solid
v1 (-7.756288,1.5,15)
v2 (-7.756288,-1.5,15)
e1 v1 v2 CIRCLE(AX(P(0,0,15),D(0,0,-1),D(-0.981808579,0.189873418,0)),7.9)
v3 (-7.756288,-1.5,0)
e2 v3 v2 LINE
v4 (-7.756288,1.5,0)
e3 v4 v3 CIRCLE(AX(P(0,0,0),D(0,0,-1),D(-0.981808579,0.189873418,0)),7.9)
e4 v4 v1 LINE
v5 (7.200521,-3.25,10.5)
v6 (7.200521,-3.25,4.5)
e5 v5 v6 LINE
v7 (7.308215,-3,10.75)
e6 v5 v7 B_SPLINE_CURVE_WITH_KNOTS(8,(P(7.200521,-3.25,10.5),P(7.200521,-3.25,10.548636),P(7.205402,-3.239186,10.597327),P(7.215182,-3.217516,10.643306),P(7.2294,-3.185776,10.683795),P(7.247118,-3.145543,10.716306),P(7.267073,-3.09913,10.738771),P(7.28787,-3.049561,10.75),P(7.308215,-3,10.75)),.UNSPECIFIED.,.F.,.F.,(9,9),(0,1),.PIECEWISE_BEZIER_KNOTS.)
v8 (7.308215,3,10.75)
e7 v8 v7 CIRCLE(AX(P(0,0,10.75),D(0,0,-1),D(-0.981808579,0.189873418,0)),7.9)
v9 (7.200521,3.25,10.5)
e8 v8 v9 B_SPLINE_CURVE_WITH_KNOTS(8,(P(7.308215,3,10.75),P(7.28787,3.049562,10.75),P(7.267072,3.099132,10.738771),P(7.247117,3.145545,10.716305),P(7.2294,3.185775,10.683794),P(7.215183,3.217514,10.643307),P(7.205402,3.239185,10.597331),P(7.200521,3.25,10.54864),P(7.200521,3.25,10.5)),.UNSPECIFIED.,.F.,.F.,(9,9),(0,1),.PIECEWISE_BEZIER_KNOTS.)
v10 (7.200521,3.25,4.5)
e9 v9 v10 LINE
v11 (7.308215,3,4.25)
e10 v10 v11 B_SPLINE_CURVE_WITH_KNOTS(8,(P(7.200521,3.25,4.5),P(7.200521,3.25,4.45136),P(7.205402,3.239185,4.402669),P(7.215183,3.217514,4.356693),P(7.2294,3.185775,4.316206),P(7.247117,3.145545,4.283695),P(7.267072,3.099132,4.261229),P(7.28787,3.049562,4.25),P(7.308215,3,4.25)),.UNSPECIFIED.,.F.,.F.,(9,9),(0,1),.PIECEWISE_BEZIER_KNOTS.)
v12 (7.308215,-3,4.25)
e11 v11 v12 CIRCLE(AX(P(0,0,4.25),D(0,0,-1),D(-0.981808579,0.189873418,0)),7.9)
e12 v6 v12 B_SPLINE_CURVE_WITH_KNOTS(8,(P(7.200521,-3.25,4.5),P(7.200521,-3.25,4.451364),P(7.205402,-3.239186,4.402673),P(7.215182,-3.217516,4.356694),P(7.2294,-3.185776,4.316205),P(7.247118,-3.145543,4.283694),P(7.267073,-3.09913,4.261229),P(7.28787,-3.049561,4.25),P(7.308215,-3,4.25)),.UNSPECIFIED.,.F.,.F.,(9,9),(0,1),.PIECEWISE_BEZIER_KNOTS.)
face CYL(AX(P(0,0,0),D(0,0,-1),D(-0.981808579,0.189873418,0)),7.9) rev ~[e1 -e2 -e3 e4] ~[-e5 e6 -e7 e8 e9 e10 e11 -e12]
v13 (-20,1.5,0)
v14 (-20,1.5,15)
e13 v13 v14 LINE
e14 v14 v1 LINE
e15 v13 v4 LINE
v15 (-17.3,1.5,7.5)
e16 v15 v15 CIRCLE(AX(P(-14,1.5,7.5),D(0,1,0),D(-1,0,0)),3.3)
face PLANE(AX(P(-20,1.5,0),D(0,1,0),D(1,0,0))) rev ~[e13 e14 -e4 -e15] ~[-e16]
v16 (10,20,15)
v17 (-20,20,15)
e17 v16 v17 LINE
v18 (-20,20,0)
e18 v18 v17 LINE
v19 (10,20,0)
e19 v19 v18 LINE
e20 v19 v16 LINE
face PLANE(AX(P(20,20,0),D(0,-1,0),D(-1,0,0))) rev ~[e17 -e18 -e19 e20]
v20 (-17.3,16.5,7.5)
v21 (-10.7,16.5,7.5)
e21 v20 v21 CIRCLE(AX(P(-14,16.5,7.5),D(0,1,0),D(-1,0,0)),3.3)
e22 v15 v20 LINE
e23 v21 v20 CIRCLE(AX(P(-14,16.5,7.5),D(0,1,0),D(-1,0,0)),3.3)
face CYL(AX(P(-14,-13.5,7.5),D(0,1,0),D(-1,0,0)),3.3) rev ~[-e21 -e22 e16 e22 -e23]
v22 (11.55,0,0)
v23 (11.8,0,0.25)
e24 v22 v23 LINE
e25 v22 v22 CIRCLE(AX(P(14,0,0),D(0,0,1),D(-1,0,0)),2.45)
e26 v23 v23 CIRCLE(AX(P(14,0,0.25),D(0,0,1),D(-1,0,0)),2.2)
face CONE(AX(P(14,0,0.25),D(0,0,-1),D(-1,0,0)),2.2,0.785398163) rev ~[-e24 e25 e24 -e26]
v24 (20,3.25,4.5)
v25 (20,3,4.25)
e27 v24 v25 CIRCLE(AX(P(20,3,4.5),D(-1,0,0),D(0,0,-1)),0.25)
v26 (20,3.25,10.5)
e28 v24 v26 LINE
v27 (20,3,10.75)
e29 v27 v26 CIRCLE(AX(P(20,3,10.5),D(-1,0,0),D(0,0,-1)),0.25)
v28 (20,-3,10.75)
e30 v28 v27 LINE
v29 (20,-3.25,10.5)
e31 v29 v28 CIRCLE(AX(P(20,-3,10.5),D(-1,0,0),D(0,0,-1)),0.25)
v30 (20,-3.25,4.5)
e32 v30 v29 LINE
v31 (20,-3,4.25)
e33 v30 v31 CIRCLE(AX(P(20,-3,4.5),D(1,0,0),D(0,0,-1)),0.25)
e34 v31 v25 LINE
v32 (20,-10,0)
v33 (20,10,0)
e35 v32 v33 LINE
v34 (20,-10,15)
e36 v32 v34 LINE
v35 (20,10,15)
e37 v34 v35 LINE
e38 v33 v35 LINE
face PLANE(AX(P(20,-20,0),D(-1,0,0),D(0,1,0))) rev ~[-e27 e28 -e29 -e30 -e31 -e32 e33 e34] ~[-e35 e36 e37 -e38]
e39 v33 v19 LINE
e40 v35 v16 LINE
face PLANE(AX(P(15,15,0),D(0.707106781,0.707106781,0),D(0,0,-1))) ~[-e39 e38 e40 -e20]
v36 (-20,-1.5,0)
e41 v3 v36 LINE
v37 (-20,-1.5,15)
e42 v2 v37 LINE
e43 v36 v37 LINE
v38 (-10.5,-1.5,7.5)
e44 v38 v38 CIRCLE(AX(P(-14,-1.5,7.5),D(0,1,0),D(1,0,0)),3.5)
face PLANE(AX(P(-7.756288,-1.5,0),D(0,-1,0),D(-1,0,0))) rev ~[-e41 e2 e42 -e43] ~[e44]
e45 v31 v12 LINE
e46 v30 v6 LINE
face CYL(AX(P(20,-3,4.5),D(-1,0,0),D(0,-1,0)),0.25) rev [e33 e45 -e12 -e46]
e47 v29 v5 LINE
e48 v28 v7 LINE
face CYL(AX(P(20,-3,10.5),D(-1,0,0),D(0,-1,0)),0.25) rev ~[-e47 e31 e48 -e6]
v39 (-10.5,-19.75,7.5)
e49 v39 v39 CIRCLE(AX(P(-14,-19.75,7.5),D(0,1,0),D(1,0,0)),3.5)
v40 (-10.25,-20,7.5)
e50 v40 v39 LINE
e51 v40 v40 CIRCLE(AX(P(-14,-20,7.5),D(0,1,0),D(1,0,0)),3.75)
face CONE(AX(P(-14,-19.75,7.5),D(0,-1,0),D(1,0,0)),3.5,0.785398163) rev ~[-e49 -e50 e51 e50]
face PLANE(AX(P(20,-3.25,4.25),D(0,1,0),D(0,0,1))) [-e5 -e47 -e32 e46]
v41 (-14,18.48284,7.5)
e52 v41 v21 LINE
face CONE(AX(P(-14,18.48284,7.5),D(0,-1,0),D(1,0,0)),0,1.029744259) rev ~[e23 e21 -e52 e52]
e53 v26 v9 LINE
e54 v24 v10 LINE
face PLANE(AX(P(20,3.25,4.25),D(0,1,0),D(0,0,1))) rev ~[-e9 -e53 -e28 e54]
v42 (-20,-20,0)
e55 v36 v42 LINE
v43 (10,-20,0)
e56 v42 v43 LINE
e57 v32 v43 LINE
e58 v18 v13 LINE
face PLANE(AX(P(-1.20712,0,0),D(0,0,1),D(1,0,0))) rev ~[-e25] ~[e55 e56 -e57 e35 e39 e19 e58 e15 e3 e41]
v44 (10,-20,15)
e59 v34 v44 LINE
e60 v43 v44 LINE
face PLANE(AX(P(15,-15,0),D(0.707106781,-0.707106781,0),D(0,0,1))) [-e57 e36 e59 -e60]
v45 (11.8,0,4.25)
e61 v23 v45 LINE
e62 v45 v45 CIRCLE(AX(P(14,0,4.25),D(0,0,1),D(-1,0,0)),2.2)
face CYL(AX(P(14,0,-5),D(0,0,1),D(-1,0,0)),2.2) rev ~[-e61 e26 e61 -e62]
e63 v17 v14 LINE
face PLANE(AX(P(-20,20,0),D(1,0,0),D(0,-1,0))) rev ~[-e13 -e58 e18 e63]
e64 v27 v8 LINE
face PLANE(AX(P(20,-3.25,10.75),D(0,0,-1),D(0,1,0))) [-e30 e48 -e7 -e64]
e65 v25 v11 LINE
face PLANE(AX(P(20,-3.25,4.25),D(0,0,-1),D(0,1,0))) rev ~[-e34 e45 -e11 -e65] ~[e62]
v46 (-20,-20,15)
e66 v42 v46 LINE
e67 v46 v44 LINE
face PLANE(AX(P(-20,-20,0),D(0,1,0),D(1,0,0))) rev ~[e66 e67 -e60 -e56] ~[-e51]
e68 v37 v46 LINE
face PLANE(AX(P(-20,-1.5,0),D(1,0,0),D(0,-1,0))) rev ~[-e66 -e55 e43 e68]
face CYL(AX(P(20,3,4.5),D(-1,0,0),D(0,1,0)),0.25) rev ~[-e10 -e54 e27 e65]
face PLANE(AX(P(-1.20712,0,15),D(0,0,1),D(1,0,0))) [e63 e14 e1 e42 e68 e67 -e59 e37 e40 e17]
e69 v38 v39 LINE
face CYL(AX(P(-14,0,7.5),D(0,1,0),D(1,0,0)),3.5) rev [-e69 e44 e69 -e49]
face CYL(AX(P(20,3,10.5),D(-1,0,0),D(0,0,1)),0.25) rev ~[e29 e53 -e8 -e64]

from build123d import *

# Parameters (mm, degrees)
F1_DEPTH  = 15
F2_R      = 3.5
F3_DEPTH  = 25
F5_D      = 6.6
F5_DEPTH  = 15
F5_TIP    = 1.9828400428
F6_SIZE   = 10
F7_W      = 6.5
F7_H      = 6.5
F8_DEPTH  = 12.8004791855
F10_D     = 4.4
F10_DEPTH = 5
F10_TIP   = 1.3218933619
F11_SIZE  = 0.25
F12_R     = 0.25


with BuildPart() as f1:
    # F0 (on Top) → F1 (new body)
    with BuildSketch(Plane.XY):
        with BuildLine():
            Line((20, -20), (20, 20))
            Line((20, 20), (-20, 20))
            Line((-20, 20), (-20, 1.5))
            Line((-20, 1.5), (-7.7562877719, 1.5))
            ThreePointArc((-7.7562877719, 1.5), (7.9, 0), (-7.7562877719, -1.5))
            Line((-7.7562877719, -1.5), (-20, -1.5))
            Line((-20, -1.5), (-20, -20))
            Line((-20, -20), (20, -20))
        make_face()
    extrude(amount=F1_DEPTH)

    # F2 (on Front) → F3 (cut)
    with BuildSketch(Plane.XZ):
        with Locations((-14, 7.5)):
            Circle(F2_R)
    extrude(amount=F3_DEPTH, mode=Mode.SUBTRACT)

    # F5
    with Locations(Plane.XZ.offset(-1.5)):
        with Locations((-14, 7.5)):
            Hole(F5_D / 2, depth=F5_DEPTH)
            with Locations((0, 0, -(F5_DEPTH + F5_TIP / 2))):  # 118° drill point
                Cone(0, F5_D / 2, F5_TIP, mode=Mode.SUBTRACT)

    # F6
    f6_edges = [f1.edges().sort_by_distance(p)[0] for p in [
        (20, -20, 7.5),
        (20, 20, 7.5),
    ]]
    chamfer(f6_edges, length=F6_SIZE)

    # F7 (on face) → F8 (cut, through all)
    with BuildSketch(Plane.YZ.offset(20)):
        with Locations((0, 7.5)):
            Rectangle(F7_W, F7_H)
    extrude(amount=-F8_DEPTH, mode=Mode.SUBTRACT)

    # F10
    with Locations(Plane(origin=(0, 0, 0), x_dir=(1, 0, 0), z_dir=(0, 0, -1))):
        with Locations((14, 0)):
            Hole(F10_D / 2, depth=F10_DEPTH)
            with Locations((0, 0, -(F10_DEPTH + F10_TIP / 2))):  # 118° drill point
                Cone(0, F10_D / 2, F10_TIP, mode=Mode.SUBTRACT)

    # F11
    f11_edges = [f1.edges().sort_by_distance(p)[0] for p in [
        (-17.5, -20, 7.5),
        (11.8, 0, 0),
    ]]
    chamfer(f11_edges, length=F11_SIZE)

    # F12
    f12_edges = [f1.edges().sort_by_distance(p)[0] for p in [
        (13.60026, 3.25, 4.25),
        (13.60026, -3.25, 4.25),
        (13.60026, 3.25, 10.75),
        (13.60026, -3.25, 10.75),
    ]]
    fillet(f12_edges, radius=F12_R)


solid = f1.part
